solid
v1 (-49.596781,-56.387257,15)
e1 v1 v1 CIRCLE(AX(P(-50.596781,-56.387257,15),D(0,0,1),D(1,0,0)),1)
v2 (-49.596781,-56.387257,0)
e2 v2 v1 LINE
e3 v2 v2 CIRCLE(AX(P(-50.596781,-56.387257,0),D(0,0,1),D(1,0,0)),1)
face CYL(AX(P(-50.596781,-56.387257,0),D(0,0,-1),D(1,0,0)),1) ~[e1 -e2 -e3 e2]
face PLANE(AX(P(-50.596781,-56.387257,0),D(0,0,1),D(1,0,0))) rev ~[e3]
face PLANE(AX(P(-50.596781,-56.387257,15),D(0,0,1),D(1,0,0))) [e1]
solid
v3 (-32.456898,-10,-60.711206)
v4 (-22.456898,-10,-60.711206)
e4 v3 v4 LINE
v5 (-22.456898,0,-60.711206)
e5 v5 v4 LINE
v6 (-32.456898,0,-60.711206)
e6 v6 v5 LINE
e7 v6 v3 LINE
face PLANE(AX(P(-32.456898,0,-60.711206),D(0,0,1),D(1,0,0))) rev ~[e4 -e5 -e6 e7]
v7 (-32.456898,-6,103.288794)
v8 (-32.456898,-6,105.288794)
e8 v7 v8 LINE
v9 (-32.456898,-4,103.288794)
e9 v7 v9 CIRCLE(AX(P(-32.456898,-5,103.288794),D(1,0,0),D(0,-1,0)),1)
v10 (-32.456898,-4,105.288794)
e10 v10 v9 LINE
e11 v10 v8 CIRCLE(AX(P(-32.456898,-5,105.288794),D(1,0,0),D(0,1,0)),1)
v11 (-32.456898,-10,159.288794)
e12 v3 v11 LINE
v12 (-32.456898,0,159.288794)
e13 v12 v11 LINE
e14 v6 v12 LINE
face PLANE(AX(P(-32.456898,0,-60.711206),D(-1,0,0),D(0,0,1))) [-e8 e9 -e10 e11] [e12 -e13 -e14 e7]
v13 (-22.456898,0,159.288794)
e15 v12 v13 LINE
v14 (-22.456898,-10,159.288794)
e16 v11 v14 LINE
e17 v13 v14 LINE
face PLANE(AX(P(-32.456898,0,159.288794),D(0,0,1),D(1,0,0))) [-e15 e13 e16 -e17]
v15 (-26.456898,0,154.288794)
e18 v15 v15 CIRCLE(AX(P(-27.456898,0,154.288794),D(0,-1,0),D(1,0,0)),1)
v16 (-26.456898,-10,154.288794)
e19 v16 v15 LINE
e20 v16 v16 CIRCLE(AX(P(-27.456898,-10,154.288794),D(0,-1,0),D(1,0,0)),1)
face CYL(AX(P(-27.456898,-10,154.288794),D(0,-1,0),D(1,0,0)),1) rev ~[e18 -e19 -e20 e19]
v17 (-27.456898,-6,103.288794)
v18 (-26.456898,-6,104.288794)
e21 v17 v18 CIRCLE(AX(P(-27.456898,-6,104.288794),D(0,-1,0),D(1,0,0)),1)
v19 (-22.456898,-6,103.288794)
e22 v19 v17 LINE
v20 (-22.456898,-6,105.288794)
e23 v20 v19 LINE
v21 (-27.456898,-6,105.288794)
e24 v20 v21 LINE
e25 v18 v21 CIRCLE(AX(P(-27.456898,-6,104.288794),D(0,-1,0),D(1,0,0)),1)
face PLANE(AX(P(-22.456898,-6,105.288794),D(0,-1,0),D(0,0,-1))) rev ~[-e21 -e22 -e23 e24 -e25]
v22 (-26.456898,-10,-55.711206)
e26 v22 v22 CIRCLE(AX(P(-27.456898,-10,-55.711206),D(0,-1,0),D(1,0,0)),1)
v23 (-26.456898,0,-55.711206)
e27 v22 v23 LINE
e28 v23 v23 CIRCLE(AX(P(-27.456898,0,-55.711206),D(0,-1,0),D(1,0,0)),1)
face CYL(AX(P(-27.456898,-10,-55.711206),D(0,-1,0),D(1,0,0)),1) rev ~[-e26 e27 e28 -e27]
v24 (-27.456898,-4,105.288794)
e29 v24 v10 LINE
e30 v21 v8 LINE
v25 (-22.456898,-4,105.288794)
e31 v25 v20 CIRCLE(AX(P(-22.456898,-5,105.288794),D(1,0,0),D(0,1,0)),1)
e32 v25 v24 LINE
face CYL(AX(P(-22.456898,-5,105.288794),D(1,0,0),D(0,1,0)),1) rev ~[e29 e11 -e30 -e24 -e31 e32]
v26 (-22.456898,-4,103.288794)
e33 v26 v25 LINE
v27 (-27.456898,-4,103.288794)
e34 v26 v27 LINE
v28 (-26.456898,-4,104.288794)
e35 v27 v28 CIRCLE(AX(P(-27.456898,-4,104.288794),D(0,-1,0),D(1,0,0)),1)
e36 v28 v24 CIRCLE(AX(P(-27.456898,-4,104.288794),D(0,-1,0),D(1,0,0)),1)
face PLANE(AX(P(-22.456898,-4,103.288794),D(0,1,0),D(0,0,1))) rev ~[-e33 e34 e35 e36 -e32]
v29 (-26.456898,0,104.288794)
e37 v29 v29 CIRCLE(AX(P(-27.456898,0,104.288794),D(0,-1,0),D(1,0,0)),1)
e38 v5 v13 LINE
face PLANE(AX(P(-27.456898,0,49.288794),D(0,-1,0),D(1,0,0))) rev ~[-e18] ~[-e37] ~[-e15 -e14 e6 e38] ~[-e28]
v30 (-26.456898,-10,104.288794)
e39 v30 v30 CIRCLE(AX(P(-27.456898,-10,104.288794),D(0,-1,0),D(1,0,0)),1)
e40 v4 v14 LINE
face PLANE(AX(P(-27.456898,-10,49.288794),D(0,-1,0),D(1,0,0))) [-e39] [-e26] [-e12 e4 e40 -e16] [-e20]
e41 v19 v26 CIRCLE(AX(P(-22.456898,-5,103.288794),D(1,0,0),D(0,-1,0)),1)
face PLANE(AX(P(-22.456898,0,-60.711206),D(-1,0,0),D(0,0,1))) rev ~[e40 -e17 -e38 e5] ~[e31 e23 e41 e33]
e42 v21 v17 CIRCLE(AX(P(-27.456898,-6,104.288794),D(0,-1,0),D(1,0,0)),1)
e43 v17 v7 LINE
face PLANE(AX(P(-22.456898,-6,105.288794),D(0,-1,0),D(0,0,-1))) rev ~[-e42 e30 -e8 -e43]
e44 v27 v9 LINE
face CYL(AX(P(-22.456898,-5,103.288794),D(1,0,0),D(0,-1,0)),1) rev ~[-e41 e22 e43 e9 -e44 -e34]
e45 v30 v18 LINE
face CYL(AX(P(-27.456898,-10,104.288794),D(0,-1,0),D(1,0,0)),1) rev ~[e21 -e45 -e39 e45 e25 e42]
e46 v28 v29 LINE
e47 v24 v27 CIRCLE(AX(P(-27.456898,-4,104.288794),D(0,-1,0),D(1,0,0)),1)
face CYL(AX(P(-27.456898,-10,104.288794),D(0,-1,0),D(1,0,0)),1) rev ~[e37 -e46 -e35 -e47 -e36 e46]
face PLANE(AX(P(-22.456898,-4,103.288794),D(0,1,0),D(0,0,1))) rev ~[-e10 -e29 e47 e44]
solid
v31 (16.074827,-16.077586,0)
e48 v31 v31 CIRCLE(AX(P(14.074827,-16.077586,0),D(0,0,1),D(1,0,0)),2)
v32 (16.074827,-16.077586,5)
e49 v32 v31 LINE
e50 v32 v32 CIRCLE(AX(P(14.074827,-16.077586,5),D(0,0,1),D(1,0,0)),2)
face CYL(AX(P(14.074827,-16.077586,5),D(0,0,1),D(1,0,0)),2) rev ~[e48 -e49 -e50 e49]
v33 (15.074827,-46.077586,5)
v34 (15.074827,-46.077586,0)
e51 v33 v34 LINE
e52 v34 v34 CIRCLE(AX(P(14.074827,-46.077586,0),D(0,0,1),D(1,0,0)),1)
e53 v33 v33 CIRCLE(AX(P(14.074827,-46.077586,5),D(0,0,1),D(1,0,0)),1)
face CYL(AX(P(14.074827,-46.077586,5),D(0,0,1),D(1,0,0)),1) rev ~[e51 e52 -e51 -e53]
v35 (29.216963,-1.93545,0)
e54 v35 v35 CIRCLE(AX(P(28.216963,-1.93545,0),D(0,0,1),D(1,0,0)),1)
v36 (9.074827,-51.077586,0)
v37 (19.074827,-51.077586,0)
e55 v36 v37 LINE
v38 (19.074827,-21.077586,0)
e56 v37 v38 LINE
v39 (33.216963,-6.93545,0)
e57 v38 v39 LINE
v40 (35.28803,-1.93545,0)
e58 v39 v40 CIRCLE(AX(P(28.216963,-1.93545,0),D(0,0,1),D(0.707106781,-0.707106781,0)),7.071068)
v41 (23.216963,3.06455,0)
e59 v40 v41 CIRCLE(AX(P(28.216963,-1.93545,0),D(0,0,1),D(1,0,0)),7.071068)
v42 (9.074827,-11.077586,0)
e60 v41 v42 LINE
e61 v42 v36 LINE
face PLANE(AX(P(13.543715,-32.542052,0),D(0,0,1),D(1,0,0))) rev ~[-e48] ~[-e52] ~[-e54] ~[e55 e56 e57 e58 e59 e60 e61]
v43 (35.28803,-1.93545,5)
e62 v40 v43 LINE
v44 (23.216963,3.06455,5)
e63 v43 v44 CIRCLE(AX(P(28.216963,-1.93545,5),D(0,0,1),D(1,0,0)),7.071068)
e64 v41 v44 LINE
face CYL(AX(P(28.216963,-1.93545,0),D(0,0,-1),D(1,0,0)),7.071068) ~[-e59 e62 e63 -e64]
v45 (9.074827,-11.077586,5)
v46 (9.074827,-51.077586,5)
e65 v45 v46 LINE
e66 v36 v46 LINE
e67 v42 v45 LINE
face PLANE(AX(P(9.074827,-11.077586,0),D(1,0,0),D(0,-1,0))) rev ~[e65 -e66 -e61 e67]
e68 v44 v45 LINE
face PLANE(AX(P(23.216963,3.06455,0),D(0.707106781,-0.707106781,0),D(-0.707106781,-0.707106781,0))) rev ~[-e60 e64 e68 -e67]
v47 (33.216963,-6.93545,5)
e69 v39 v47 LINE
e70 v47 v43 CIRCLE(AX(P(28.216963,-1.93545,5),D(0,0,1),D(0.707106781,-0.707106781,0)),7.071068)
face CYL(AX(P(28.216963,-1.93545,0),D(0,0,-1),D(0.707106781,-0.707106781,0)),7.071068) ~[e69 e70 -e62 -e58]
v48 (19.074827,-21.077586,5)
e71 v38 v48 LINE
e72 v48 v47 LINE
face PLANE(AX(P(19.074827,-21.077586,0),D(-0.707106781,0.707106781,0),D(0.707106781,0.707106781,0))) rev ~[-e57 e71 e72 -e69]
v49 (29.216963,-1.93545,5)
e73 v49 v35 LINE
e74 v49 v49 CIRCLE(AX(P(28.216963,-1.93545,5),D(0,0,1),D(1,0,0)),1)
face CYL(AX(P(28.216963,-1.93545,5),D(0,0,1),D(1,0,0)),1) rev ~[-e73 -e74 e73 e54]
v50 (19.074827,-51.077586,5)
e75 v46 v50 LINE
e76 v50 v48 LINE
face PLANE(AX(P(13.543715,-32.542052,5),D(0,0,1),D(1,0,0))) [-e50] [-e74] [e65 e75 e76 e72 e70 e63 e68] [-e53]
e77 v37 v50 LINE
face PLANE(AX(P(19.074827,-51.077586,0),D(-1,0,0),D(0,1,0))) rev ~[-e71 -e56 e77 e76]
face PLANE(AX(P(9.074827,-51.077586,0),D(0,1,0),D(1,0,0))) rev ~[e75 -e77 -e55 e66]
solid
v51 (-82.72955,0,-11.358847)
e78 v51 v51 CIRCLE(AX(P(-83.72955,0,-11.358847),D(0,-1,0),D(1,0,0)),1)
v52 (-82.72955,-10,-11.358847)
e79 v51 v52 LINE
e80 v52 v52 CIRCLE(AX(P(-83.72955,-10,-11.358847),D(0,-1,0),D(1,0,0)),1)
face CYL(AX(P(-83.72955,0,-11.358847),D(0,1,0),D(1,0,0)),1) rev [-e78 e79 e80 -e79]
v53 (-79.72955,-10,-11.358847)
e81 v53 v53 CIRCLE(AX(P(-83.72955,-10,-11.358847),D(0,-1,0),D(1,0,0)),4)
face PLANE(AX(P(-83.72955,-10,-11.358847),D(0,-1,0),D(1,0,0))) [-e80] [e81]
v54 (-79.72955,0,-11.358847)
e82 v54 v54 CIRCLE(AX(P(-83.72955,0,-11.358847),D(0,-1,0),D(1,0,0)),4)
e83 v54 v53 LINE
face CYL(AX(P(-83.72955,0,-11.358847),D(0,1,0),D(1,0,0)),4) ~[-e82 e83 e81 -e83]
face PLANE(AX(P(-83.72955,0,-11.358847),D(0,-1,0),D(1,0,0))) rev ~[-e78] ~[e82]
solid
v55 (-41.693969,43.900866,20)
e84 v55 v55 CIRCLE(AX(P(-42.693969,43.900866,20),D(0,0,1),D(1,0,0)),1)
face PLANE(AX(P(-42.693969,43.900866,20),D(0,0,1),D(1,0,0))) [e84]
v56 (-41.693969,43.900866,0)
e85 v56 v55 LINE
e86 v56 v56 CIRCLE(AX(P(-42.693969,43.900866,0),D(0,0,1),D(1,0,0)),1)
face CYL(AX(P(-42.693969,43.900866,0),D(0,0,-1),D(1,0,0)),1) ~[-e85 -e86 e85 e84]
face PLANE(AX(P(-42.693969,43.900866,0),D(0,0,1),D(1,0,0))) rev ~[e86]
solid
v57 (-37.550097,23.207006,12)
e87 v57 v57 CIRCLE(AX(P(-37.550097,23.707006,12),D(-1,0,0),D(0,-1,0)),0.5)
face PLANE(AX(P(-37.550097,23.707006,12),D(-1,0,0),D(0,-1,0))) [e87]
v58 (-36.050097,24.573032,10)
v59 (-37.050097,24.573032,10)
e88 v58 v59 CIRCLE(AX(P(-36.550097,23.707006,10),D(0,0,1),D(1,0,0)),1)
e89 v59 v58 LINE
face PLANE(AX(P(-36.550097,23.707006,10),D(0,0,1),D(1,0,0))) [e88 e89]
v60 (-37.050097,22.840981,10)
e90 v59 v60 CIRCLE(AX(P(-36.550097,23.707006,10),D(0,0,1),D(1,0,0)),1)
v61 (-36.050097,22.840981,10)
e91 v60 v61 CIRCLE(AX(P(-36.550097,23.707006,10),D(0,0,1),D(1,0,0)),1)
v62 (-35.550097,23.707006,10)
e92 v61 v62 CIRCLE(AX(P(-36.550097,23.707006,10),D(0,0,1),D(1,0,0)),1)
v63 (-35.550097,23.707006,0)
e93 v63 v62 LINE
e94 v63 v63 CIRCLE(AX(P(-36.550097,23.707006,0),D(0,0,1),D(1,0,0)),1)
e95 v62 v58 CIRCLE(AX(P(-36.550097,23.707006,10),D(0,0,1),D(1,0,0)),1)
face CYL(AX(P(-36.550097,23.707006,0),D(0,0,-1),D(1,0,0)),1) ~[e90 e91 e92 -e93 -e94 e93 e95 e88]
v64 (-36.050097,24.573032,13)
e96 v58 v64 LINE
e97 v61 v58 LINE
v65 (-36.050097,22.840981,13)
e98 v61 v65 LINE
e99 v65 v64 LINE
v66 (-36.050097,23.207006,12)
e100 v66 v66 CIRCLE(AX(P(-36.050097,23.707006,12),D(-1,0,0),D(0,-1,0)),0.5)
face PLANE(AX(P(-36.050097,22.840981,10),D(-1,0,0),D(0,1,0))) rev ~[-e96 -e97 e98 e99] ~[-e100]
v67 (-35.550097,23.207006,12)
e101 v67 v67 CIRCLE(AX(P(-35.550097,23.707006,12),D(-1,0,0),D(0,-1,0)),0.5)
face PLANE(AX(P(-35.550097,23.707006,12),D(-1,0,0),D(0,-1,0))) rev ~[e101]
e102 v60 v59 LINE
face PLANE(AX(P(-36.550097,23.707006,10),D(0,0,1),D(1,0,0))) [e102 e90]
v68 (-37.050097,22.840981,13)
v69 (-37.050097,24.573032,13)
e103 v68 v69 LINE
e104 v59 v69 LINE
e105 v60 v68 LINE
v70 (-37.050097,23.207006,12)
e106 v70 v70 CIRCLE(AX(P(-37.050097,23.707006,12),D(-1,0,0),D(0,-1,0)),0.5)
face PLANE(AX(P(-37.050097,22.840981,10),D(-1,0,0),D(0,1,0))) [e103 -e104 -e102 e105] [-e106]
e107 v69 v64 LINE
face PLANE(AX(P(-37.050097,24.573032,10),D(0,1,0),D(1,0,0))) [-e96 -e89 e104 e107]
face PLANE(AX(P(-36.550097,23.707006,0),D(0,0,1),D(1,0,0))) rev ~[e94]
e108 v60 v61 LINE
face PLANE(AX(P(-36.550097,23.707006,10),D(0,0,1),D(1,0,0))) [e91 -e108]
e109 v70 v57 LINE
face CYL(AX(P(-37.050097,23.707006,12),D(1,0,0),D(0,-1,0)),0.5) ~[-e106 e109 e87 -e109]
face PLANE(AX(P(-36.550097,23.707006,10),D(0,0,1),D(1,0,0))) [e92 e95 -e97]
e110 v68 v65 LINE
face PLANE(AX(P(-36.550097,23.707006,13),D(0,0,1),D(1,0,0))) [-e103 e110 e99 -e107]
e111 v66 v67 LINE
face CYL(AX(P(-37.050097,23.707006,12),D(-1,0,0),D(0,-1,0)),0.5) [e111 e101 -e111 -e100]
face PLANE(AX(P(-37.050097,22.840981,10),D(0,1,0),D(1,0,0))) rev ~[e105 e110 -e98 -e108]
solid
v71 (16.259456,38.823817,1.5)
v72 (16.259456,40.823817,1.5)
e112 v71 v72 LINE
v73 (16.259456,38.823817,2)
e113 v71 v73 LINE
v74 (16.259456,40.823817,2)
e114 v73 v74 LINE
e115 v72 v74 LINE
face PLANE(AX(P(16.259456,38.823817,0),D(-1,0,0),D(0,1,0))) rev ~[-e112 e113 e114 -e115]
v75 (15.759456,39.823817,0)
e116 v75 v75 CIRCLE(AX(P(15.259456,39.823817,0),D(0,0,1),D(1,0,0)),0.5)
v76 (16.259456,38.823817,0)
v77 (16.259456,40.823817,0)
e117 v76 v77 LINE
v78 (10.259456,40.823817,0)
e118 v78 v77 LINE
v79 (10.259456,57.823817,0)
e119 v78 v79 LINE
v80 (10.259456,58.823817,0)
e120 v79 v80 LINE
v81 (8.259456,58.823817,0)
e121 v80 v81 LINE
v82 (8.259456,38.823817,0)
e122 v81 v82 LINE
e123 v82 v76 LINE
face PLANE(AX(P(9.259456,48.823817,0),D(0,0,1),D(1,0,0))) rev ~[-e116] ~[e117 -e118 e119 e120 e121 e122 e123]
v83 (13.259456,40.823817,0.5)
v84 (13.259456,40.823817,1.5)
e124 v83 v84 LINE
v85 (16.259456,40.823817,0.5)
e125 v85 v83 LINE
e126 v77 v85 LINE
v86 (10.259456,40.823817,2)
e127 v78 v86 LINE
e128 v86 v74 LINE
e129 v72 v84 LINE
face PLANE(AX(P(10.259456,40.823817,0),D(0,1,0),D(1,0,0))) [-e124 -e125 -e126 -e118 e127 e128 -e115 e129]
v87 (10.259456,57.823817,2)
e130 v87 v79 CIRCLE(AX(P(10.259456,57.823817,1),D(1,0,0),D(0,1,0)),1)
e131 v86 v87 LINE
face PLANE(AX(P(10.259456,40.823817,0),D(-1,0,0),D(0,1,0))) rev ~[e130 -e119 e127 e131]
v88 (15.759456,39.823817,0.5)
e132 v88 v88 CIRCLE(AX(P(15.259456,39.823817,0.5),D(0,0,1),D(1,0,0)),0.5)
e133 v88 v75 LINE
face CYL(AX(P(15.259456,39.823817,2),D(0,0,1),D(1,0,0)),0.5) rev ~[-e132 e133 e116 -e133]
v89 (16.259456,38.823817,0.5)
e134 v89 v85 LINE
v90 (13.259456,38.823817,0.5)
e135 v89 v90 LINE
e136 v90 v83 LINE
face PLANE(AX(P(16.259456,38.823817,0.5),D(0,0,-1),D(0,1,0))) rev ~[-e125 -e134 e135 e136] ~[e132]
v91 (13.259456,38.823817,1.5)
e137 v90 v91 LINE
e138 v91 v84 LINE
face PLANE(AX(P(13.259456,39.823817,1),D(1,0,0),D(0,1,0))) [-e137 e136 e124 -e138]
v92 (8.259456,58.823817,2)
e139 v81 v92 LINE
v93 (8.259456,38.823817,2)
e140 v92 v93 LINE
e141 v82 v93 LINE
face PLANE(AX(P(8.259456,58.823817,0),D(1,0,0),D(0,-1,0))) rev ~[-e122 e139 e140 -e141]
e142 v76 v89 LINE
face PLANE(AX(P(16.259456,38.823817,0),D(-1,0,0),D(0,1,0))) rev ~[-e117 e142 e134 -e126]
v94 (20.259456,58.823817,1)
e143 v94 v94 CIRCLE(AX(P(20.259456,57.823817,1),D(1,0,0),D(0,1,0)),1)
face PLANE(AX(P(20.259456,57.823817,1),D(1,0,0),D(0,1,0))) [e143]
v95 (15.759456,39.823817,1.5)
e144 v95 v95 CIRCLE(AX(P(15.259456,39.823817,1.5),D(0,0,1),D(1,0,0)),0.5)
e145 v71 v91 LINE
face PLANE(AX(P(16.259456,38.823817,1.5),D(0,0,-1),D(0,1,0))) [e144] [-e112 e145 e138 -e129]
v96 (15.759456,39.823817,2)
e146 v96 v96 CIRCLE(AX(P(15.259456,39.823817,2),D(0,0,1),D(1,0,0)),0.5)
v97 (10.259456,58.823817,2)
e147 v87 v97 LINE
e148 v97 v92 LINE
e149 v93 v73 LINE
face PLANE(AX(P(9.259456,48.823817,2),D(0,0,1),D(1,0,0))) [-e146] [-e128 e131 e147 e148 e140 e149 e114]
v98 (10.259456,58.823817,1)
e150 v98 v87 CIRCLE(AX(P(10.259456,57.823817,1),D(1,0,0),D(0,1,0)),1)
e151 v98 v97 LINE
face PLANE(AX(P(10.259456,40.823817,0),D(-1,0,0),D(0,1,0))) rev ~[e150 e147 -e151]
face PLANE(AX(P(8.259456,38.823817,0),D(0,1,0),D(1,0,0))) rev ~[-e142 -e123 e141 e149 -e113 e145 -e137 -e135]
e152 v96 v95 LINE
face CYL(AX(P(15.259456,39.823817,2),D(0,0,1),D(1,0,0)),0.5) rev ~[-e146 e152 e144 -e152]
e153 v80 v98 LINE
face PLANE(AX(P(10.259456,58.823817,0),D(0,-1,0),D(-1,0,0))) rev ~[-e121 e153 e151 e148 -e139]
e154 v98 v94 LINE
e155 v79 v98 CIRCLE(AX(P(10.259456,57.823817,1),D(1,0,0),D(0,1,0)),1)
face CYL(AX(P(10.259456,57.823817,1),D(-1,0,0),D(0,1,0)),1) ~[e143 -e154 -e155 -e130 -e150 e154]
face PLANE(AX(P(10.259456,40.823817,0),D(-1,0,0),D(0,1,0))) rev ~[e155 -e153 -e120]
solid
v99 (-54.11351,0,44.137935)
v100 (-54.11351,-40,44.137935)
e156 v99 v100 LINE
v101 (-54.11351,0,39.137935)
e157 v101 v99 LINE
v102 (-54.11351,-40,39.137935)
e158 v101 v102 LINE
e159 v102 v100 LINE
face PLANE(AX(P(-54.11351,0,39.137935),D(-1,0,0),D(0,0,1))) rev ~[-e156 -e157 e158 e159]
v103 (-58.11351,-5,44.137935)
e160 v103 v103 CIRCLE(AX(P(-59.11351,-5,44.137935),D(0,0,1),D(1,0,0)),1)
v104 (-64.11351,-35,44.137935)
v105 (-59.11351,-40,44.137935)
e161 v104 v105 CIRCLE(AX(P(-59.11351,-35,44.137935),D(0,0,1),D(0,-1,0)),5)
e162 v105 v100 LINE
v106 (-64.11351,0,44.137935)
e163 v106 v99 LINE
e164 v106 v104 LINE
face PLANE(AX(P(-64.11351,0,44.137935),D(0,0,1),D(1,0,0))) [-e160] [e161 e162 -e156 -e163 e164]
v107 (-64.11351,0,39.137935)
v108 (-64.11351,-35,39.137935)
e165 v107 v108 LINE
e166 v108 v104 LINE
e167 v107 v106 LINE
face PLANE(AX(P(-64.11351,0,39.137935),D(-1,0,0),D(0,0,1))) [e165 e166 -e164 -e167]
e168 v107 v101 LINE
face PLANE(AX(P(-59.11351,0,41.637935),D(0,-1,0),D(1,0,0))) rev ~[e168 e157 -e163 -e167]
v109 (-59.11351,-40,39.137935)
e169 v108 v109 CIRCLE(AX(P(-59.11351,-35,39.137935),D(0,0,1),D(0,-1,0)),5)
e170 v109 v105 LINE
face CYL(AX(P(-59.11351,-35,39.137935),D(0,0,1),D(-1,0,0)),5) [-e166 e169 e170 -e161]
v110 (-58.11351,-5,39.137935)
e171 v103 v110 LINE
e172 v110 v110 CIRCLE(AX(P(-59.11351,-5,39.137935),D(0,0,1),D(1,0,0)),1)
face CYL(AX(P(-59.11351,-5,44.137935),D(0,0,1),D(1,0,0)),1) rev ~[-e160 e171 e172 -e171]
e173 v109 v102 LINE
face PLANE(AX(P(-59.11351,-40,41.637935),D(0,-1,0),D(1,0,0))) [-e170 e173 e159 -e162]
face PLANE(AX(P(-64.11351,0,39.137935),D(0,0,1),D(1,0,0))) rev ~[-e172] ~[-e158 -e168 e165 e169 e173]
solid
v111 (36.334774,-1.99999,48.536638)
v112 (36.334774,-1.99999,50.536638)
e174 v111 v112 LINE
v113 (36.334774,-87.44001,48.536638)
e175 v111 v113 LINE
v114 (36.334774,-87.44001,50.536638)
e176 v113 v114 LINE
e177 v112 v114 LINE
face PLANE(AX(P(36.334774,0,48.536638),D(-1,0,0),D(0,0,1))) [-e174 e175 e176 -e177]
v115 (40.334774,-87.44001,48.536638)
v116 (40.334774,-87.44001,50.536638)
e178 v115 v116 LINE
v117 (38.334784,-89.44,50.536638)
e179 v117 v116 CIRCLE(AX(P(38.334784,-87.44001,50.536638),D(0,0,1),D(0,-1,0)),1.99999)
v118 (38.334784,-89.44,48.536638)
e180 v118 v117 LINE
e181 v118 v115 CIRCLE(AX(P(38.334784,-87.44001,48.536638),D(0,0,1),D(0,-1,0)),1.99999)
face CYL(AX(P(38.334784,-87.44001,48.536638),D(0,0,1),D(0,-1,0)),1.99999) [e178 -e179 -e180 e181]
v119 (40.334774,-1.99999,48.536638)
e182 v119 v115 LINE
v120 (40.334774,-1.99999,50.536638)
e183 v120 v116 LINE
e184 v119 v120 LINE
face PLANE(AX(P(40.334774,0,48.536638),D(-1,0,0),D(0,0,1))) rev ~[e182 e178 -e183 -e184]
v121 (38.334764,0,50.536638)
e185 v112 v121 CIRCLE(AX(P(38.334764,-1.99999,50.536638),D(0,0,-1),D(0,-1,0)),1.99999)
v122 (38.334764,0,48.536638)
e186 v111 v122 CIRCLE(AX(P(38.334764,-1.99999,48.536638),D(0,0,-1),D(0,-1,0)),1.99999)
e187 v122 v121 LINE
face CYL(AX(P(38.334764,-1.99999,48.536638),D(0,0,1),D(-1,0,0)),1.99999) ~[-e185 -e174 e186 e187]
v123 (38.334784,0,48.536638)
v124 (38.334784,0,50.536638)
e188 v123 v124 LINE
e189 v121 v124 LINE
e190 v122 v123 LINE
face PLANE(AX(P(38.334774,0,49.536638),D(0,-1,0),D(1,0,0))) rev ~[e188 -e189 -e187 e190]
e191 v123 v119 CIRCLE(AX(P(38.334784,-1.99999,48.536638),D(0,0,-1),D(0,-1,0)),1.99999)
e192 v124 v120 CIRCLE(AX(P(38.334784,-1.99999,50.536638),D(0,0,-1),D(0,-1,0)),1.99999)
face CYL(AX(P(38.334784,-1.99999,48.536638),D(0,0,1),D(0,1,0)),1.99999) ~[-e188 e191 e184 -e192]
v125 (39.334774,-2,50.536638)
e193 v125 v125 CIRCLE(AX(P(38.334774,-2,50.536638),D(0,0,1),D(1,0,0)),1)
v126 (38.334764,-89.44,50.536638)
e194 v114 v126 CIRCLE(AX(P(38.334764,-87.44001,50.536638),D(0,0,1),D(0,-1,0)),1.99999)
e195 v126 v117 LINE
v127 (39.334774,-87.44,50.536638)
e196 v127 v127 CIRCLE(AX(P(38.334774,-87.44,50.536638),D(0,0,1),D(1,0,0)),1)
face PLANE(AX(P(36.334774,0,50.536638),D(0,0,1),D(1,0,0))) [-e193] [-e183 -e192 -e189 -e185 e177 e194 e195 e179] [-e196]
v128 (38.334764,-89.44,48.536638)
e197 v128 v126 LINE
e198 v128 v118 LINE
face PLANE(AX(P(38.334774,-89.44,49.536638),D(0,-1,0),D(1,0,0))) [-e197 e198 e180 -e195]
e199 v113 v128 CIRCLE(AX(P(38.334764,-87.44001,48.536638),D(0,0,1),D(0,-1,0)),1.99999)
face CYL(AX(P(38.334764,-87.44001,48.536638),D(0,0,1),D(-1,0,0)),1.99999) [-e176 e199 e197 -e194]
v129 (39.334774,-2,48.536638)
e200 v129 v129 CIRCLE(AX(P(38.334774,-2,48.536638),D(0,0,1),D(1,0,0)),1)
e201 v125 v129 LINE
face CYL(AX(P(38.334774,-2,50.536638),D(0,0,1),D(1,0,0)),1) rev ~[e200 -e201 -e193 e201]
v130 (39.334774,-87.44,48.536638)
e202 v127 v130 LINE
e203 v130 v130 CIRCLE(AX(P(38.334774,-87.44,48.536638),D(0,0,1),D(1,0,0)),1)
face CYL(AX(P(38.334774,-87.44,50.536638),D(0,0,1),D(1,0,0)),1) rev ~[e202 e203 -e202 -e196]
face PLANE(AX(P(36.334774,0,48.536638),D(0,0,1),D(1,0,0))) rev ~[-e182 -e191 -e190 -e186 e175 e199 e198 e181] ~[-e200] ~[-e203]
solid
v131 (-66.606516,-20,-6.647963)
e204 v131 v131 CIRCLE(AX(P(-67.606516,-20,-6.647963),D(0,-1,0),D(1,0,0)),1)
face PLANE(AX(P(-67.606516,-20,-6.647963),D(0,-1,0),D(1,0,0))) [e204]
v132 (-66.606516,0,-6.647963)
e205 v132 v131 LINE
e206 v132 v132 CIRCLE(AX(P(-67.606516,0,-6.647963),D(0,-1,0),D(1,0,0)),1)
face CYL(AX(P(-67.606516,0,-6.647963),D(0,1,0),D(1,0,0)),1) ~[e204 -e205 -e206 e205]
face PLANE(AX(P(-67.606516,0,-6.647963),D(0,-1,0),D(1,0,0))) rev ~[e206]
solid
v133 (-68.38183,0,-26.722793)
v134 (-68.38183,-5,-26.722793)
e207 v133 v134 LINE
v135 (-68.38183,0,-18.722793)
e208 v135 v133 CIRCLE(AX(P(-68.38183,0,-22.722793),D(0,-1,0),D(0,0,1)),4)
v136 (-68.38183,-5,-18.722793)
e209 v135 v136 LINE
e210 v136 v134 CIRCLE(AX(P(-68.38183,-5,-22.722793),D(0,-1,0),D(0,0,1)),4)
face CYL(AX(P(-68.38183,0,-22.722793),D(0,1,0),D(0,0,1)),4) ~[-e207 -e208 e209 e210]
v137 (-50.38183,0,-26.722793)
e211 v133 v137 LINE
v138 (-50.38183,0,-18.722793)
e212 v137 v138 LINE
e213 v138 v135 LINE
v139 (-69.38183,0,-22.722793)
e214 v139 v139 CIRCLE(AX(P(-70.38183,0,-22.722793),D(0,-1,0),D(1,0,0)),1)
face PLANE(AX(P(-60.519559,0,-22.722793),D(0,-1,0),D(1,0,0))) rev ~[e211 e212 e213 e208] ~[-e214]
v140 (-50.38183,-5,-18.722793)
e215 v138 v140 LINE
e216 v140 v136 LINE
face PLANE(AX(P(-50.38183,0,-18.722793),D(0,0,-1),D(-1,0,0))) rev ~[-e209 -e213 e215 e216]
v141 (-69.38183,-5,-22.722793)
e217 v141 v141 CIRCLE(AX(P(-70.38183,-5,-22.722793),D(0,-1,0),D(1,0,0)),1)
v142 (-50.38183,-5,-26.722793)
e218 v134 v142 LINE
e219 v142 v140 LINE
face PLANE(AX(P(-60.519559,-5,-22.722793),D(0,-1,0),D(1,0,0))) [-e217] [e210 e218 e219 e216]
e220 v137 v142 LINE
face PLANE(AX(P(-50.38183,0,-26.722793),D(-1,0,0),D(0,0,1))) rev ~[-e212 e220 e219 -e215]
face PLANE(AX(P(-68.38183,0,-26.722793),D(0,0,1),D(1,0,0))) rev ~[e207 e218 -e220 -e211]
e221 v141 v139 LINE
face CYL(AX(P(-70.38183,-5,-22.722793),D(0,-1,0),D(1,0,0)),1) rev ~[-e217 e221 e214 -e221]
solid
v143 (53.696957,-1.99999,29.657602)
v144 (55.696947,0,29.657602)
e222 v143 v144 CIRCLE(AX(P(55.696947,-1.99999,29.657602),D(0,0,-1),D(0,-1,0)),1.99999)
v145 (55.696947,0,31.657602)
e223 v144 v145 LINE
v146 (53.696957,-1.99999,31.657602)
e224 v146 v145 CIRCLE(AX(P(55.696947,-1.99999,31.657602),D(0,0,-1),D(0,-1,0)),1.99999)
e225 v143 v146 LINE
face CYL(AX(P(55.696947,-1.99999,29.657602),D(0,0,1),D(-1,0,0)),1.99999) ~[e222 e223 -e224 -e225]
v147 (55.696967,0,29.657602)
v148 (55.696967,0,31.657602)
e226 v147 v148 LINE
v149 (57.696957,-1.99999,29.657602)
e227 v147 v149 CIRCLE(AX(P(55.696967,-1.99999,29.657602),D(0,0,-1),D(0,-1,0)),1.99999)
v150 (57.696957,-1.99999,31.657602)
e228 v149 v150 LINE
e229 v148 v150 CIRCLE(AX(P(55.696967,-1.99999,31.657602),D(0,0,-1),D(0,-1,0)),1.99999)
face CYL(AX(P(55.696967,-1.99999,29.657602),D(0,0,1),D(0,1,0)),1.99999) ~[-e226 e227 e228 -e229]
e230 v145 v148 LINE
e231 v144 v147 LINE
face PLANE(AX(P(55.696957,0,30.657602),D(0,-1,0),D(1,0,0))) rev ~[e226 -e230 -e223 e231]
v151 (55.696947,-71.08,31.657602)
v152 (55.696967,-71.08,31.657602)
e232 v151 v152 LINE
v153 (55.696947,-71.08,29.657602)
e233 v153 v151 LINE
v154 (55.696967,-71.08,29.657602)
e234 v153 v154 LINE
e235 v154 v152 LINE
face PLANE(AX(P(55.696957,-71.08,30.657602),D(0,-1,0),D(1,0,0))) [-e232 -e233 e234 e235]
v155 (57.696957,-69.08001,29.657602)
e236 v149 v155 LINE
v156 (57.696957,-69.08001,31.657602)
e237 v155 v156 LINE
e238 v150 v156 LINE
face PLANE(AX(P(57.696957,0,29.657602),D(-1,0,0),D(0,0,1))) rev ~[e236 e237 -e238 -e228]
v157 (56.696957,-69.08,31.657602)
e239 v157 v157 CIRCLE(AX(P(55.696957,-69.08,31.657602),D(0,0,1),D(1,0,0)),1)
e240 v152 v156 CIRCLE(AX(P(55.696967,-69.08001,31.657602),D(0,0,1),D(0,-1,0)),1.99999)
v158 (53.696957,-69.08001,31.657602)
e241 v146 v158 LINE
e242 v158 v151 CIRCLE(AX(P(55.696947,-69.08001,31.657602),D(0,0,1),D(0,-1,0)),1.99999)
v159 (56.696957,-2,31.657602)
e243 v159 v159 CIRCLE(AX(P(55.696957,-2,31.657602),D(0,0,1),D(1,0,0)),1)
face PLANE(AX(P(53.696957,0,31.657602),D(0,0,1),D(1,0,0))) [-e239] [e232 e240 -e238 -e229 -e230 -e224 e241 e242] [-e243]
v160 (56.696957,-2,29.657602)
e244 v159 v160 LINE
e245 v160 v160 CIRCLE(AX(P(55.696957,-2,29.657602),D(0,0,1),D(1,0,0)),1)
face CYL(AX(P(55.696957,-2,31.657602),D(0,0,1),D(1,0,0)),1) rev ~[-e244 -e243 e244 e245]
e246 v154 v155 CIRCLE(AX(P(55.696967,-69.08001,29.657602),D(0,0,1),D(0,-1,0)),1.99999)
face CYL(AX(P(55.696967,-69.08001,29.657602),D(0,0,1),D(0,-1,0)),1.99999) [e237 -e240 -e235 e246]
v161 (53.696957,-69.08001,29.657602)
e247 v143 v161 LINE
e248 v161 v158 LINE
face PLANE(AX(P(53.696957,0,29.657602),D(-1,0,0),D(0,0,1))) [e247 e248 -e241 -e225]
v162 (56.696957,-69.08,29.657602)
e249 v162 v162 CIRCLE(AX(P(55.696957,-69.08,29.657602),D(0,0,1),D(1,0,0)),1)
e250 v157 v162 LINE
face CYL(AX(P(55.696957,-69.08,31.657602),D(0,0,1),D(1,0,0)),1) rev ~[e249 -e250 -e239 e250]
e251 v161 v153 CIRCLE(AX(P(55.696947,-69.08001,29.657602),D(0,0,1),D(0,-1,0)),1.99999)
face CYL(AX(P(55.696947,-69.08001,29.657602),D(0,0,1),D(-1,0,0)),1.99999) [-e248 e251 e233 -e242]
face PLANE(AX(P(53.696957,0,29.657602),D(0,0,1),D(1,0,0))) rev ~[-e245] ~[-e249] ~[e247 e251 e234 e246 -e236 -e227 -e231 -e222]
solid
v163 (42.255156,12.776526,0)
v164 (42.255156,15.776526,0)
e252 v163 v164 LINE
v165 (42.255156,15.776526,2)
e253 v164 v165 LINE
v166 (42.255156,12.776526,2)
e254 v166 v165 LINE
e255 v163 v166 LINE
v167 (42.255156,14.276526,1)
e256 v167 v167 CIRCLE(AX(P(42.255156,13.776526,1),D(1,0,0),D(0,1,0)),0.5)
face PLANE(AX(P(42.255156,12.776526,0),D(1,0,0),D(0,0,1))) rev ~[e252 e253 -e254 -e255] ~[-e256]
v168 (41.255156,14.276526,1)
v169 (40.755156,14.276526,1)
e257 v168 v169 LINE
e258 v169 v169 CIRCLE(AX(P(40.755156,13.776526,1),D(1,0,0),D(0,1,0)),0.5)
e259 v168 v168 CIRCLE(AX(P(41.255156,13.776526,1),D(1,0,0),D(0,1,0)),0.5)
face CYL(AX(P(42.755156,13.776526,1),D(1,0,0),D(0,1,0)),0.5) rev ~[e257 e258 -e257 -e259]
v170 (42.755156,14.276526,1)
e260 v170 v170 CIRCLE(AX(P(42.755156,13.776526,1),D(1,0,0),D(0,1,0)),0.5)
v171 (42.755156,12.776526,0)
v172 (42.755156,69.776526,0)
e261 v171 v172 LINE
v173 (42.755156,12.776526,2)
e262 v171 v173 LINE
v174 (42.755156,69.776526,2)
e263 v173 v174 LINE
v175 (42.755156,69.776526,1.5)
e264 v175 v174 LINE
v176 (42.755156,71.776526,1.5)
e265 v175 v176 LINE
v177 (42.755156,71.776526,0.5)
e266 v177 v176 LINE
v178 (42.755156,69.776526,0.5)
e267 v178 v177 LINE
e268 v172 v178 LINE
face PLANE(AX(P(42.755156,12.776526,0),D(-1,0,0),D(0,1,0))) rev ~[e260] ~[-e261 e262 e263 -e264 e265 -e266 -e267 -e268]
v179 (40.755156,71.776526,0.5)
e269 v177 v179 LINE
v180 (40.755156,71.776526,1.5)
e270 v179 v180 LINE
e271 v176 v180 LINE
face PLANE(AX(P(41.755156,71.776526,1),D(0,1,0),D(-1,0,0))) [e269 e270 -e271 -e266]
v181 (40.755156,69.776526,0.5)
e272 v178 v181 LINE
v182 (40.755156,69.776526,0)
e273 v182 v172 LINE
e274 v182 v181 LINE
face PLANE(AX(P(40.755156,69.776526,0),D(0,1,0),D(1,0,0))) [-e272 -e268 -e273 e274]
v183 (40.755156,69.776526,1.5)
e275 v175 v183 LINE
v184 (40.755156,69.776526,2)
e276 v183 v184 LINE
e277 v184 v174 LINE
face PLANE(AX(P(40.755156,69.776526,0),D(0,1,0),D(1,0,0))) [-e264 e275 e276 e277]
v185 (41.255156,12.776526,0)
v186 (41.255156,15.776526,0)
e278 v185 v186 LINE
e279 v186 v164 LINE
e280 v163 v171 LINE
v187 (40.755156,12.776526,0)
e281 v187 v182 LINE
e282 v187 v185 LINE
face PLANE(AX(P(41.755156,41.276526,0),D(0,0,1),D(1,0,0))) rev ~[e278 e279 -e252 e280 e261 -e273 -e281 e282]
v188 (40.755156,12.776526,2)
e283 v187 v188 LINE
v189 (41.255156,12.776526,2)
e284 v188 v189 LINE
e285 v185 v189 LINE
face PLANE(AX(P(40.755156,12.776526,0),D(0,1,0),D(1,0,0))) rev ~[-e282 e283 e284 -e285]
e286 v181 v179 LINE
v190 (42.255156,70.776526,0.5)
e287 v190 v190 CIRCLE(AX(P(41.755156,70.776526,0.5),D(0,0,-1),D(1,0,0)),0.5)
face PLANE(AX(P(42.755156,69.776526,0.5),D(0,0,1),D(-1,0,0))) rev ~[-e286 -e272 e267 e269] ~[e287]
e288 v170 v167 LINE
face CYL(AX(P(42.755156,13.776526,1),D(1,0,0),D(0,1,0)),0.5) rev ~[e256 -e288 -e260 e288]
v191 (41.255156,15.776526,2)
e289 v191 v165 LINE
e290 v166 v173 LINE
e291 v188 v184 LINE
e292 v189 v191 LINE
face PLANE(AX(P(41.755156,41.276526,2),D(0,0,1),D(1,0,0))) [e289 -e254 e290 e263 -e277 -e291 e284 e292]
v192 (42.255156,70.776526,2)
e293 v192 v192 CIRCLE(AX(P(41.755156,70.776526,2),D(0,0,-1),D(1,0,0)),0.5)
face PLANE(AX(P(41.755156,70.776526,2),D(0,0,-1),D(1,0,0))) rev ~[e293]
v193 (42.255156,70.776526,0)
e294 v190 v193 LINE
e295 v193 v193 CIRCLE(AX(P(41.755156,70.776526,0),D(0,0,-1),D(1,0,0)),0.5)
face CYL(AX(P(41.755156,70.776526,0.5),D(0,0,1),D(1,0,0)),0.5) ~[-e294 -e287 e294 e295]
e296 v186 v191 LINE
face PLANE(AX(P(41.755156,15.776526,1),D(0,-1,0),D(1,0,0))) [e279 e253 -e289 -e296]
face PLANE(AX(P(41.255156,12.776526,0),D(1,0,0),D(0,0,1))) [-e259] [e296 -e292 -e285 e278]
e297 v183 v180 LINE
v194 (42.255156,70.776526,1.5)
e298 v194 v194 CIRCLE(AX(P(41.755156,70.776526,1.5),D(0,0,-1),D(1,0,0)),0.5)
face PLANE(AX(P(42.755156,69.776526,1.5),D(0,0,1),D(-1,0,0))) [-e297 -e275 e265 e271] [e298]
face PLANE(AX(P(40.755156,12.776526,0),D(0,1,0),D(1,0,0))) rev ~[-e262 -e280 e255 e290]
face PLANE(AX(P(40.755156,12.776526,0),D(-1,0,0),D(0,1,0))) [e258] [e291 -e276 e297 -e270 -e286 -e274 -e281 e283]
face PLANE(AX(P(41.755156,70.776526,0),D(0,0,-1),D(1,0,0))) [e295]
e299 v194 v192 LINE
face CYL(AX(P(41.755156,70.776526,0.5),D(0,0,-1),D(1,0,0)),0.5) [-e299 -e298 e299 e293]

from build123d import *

# Parameters (mm, degrees)
F0_W           = 10
F0_H           = 5
F1_DEPTH       = 40
F2_R           = 5
F3_R           = 1
F4_DEPTH       = 10
F6_DEPTH       = 5
F7_R           = 2
F7_R_2         = 1
F8_DEPTH       = 5.001
F9_R           = 1
F10_DEPTH      = 10
F11_W          = 10
F11_H          = 220
F12_DEPTH      = 10
F13_R          = 1
F14_DEPTH      = 15.1366173212
F15_R          = 1
F16_DEPTH      = 15.1366173212
F17_R          = 1
F18_DEPTH      = 20
F19_W          = 4
F19_H          = 2
F20_DEPTH      = 89.44
F21_R          = 1
F22_DEPTH      = 111.2488439361
F23_R          = 1.99999
F24_W          = 4
F24_H          = 2
F25_DEPTH      = 71.08
F26_R          = 1
F27_DEPTH      = 92.3698075909
F28_R          = 1.99999
F29_W          = 6
F29_H          = 2
F30_DEPTH      = 2
F29_W_2        = 2
F29_H_2        = 57
F31_R          = 1
F32_DEPTH      = 10
F33_R          = 1
F34_DEPTH      = 10
F35_W          = 1
F35_H          = 1.7320508076
F36_DEPTH      = 3
F37_R          = 0.5
F38_DEPTH      = 0.5
F38_DEPTH_BACK = 1.5
F39_W          = 2
F39_H          = 1
F40_DEPTH      = 3
F41_R          = 0.5
F42_DEPTH      = 62.7122059742
F43_W          = 2
F43_H          = 1
F44_DEPTH      = 2
F45_R          = 0.5
F46_DEPTH      = 0.5
F46_DEPTH_BACK = 1.5
F47_W          = 1
F47_H          = 2
F48_DEPTH      = 3
F49_R          = 0.5
F50_DEPTH      = 106.8696667108
F52_DEPTH      = 5
F53_R          = 1
F54_DEPTH      = 76.7775256912
F55_R          = 1
F56_DEPTH      = 20
F57_R          = 4
F57_R_2        = 1
F58_DEPTH      = 10
F60_DEPTH      = 25
F61_R          = 1
F62_DEPTH      = 15


# Not quite as in the source:
# - a fillet or chamfer is up to 0.001 mm smaller than in the source, because OpenCascade refuses the exact size


with BuildPart() as f1:
    # F0 (on Front) → F1 (new body)
    with BuildSketch(Plane.XZ):
        with Locations((-59.1135102832, 41.6379347444)):
            Rectangle(F0_W, F0_H)
    extrude(amount=F1_DEPTH)

    # F2
    f2_edges = [f1.edges().sort_by_distance(p)[0] for p in [
        (-64.11351, -40, 41.637935),
    ]]
    fillet(f2_edges, radius=F2_R)

    # F3 (on face) → F4 (cut)
    with BuildSketch(Plane.XY.offset(44.1379347444)):
        with Locations((-59.1135102832, -5)):
            Circle(F3_R)
    extrude(amount=-F4_DEPTH, mode=Mode.SUBTRACT)


with BuildPart() as f6:
    # F5 (on Top) → F6 (new body)
    with BuildSketch(Plane.XY):
        Polygon((19.0748270126, -21.0775861144), (9.0748270126, -11.0775861144), (9.0748270126, -51.0775861144), (19.0748270126, -51.0775861144), align=None)
        with BuildLine():
            Line((23.2169626363, 3.0645495093), (9.0748270126, -11.0775861144))
            Line((9.0748270126, -11.0775861144), (19.0748270126, -21.0775861144))
            Line((19.0748270126, -21.0775861144), (33.2169626363, -6.9354504907))
            ThreePointArc((33.2169626363, -6.9354504907), (23.2169626363, -6.9354504907), (23.2169626363, 3.0645495093))
        make_face()
        with BuildLine():
            ThreePointArc((35.2880304482, -1.9354504907), (30.9229431371, 4.5973643337), (23.2169626363, 3.0645495093))
            Line((23.2169626363, 3.0645495093), (33.2169626363, -6.9354504907))
            ThreePointArc((33.2169626363, -6.9354504907), (34.7497774607, -4.6414309914), (35.2880304482, -1.9354504907))
        make_face()
        with BuildLine():
            Line((33.2169626363, -6.9354504907), (23.2169626363, 3.0645495093))
            ThreePointArc((23.2169626363, 3.0645495093), (23.2169626363, -6.9354504907), (33.2169626363, -6.9354504907))
        make_face()
    extrude(amount=F6_DEPTH)

    # F7 (on face) → F8 (cut, through all)
    with BuildSketch(Plane.XY.offset(5)):
        with Locations((14.0748270126, -16.0775861144)):
            Circle(F7_R)
        with Locations((28.2169626363, -1.9354504907)):
            Circle(F7_R_2)
    extrude(amount=-F8_DEPTH, mode=Mode.SUBTRACT)

    # F9 (on face) → F10 (cut)
    with BuildSketch(Plane.XY.offset(5)):
        with Locations((14.0748270126, -46.0775861144)):
            Circle(F9_R)
    extrude(amount=-F10_DEPTH, mode=Mode.SUBTRACT)


with BuildPart() as f12:
    # F11 (on Front) → F12 (new body)
    with BuildSketch(Plane.XZ):
        with Locations((-27.4568982422, 49.2887940258)):
            Rectangle(F11_W, F11_H)
    extrude(amount=F12_DEPTH)

    # F13 (on face) → F14 (cut, through all)
    with BuildSketch(Plane.XZ.offset(10)):
        with Locations((-27.4568982422, 154.2887940258)):
            Circle(F13_R)
        with Locations((-27.4568982422, 104.2887940258)):
            Circle(F13_R)
    extrude(amount=-F14_DEPTH, mode=Mode.SUBTRACT)

    # F15 (on face) → F16 (cut, through all)
    with BuildSketch(Plane.XZ.offset(10)):
        with Locations((-27.4568982422, -55.7112059742)):
            Circle(F15_R)
    extrude(amount=-F16_DEPTH, mode=Mode.SUBTRACT)

    # F59 (on face) → F60 (cut)
    with BuildSketch(Plane.YZ.offset(-22.4568982422)):
        with BuildLine():
            Line((-4, 103.2887940258), (-4, 105.2887940258))
            ThreePointArc((-4, 105.2887940258), (-5, 106.2887940258), (-6, 105.2887940258))
            Line((-6, 105.2887940258), (-6, 103.2887940258))
            ThreePointArc((-6, 103.2887940258), (-5, 102.2887940258), (-4, 103.2887940258))
        make_face()
    extrude(amount=-F60_DEPTH, mode=Mode.SUBTRACT)


with BuildPart() as f18:
    # F17 (on Top) → F18 (new body)
    with BuildSketch(Plane.XY):
        with Locations((-42.6939688623, 43.9008660614)):
            Circle(F17_R)
    extrude(amount=F18_DEPTH)


with BuildPart() as f20:
    # F19 (on Front) → F20 (new body)
    with BuildSketch(Plane.XZ):
        with Locations((38.3347739237, 49.5366379619)):
            Rectangle(F19_W, F19_H)
    extrude(amount=F20_DEPTH)

    # F21 (on face) → F22 (cut, through all)
    with BuildSketch(Plane.XY.offset(50.5366379619)):
        with Locations((38.3347739237, -2)):
            Circle(F21_R)
        with Locations((38.3347739237, -87.44)):
            Circle(F21_R)
    extrude(amount=-F22_DEPTH, mode=Mode.SUBTRACT)

    # F23 (radius 2 in the source; OpenCascade refuses exactly that, so slightly less here)
    f23_edges = [f20.edges().sort_by_distance(p)[0] for p in [
        (36.334774, -89.44, 49.536638),
        (40.334774, -89.44, 49.536638),
        (40.334774, 0, 49.536638),
        (36.334774, 0, 49.536638),
    ]]
    fillet(f23_edges, radius=F23_R)


with BuildPart() as f25:
    # F24 (on Front) → F25 (new body)
    with BuildSketch(Plane.XZ):
        with Locations((55.6969568133, 30.6576016166)):
            Rectangle(F24_W, F24_H)
    extrude(amount=F25_DEPTH)

    # F26 (on face) → F27 (cut, through all)
    with BuildSketch(Plane.XY.offset(31.6576016166)):
        with Locations((55.6969568133, -2)):
            Circle(F26_R)
        with Locations((55.6969568133, -69.08)):
            Circle(F26_R)
    extrude(amount=-F27_DEPTH, mode=Mode.SUBTRACT)

    # F28 (radius 2 in the source; OpenCascade refuses exactly that, so slightly less here)
    f28_edges = [f25.edges().sort_by_distance(p)[0] for p in [
        (57.696957, 0, 30.657602),
        (53.696957, 0, 30.657602),
        (57.696957, -71.08, 30.657602),
        (53.696957, -71.08, 30.657602),
    ]]
    fillet(f28_edges, radius=F28_R)


with BuildPart() as f30:
    # F29 (on Top) → F30 (new body)
    with BuildSketch(Plane.XY):
        Polygon((10.2594563812, 58.8238169253), (8.2594563812, 58.8238169253), (8.2594563812, 38.8238169253), (10.2594563812, 38.8238169253), (10.2594563812, 40.8238169253), align=None)
        with Locations((13.2594563812, 39.8238169253)):
            Rectangle(F29_W, F29_H)
    extrude(amount=F30_DEPTH)

    # F31 (on face) → F32 (join)
    with BuildSketch(Plane.YZ.offset(10.2594563812)):
        with Locations((57.8238169253, 1)):
            Circle(F31_R)
    extrude(amount=F32_DEPTH)

    # F39 (on face) → F40 (cut)
    with BuildSketch(Plane.YZ.offset(16.2594563812)):
        with Locations((39.8238169253, 1)):
            Rectangle(F39_W, F39_H)
    extrude(amount=-F40_DEPTH, mode=Mode.SUBTRACT)

    # F41 (on face) → F42 (cut, through all)
    with BuildSketch(Plane.XY.offset(2)):
        with Locations((15.2594563812, 39.8238169253)):
            Circle(F41_R)
    extrude(amount=-F42_DEPTH, mode=Mode.SUBTRACT)


with BuildPart() as f30b:
    # F29 (on Top) → F30, piece 2 (new body)
    with BuildSketch(Plane.XY):
        with Locations((41.7551564276, 41.2765256912)):
            Rectangle(F29_W_2, F29_H_2)
    extrude(amount=F30_DEPTH)

    # F43 (on face) → F44 (join)
    with BuildSketch(Plane(origin=(0, 69.7765256912, 0), x_dir=(-1, 0, 0), z_dir=(0, 1, 0))):
        with Locations((-41.7551564276, 1)):
            Rectangle(F43_W, F43_H)
    extrude(amount=F44_DEPTH)

    # F45 (on face) → F46 (join, two sides)
    with BuildSketch(Plane(origin=(0, 0, 0.5), x_dir=(1, 0, 0), z_dir=(0, 0, -1))) as f46_sk:
        with Locations((41.7551564276, -70.7765256912)):
            Circle(F45_R)
    extrude(amount=F46_DEPTH)
    extrude(f46_sk.sketch, amount=-F46_DEPTH_BACK)

    # F47 (on face) → F48 (cut)
    with BuildSketch(Plane.XZ.offset(-12.7765256912)):
        with Locations((41.7551564276, 1)):
            Rectangle(F47_W, F47_H)
    extrude(amount=-F48_DEPTH, mode=Mode.SUBTRACT)

    # F49 (on face) → F50 (cut, through all)
    with BuildSketch(Plane.YZ.offset(42.7551564276)):
        with Locations((13.7765256912, 1)):
            Circle(F49_R)
    extrude(amount=-F50_DEPTH, mode=Mode.SUBTRACT)


with BuildPart() as f34:
    # F33 (on Top) → F34 (new body)
    with BuildSketch(Plane.XY):
        with Locations((-36.5500971675, 23.7070061266)):
            Circle(F33_R)
    extrude(amount=F34_DEPTH)

    # F35 (on face) → F36 (join)
    with BuildSketch(Plane.XY.offset(10)):
        with Locations((-36.5500971675, 23.7070061266)):
            Rectangle(F35_W, F35_H)
    extrude(amount=F36_DEPTH)

    # F37 (on face) → F38 (join, two sides)
    with BuildSketch(Plane(origin=(-37.0500971675, 0, 0), x_dir=(0, -1, 0), z_dir=(-1, 0, 0))) as f38_sk:
        with Locations((-23.7070061266, 12)):
            Circle(F37_R)
    extrude(amount=F38_DEPTH)
    extrude(f38_sk.sketch, amount=-F38_DEPTH_BACK)


with BuildPart() as f52:
    # F51 (on Front) → F52 (new body)
    with BuildSketch(Plane.XZ):
        with BuildLine():
            Line((-50.3818303212, -18.7227926478), (-68.3818303212, -18.7227926478))
            ThreePointArc((-68.3818303212, -18.7227926478), (-72.3818303212, -22.7227926478), (-68.3818303212, -26.7227926478))
            Line((-68.3818303212, -26.7227926478), (-50.3818303212, -26.7227926478))
            Line((-50.3818303212, -26.7227926478), (-50.3818303212, -18.7227926478))
        make_face()
    extrude(amount=F52_DEPTH)

    # F53 (on face) → F54 (cut, through all)
    with BuildSketch(Plane.XZ.offset(5)):
        with Locations((-70.3818303212, -22.7227926478)):
            Circle(F53_R)
    extrude(amount=-F54_DEPTH, mode=Mode.SUBTRACT)


with BuildPart() as f56:
    # F55 (on Front) → F56 (new body)
    with BuildSketch(Plane.XZ):
        with Locations((-67.6065161824, -6.6479626112)):
            Circle(F55_R)
    extrude(amount=F56_DEPTH)


with BuildPart() as f58:
    # F57 (on Front) → F58 (new body)
    with BuildSketch(Plane.XZ):
        with Locations((-83.7295502424, -11.3588469103)):
            Circle(F57_R)
        with Locations((-83.7295502424, -11.3588469103)):
            Circle(F57_R_2, mode=Mode.SUBTRACT)
    extrude(amount=F58_DEPTH)


with BuildPart() as f62:
    # F61 (on Top) → F62 (new body)
    with BuildSketch(Plane.XY):
        with Locations((-50.596781075, -56.3872568309)):
            Circle(F61_R)
    extrude(amount=F62_DEPTH)


solid = Compound([f1.part, f6.part, f12.part, f18.part, f20.part, f25.part, f30.part, f30b.part, f34.part, f52.part, f56.part, f58.part, f62.part])
